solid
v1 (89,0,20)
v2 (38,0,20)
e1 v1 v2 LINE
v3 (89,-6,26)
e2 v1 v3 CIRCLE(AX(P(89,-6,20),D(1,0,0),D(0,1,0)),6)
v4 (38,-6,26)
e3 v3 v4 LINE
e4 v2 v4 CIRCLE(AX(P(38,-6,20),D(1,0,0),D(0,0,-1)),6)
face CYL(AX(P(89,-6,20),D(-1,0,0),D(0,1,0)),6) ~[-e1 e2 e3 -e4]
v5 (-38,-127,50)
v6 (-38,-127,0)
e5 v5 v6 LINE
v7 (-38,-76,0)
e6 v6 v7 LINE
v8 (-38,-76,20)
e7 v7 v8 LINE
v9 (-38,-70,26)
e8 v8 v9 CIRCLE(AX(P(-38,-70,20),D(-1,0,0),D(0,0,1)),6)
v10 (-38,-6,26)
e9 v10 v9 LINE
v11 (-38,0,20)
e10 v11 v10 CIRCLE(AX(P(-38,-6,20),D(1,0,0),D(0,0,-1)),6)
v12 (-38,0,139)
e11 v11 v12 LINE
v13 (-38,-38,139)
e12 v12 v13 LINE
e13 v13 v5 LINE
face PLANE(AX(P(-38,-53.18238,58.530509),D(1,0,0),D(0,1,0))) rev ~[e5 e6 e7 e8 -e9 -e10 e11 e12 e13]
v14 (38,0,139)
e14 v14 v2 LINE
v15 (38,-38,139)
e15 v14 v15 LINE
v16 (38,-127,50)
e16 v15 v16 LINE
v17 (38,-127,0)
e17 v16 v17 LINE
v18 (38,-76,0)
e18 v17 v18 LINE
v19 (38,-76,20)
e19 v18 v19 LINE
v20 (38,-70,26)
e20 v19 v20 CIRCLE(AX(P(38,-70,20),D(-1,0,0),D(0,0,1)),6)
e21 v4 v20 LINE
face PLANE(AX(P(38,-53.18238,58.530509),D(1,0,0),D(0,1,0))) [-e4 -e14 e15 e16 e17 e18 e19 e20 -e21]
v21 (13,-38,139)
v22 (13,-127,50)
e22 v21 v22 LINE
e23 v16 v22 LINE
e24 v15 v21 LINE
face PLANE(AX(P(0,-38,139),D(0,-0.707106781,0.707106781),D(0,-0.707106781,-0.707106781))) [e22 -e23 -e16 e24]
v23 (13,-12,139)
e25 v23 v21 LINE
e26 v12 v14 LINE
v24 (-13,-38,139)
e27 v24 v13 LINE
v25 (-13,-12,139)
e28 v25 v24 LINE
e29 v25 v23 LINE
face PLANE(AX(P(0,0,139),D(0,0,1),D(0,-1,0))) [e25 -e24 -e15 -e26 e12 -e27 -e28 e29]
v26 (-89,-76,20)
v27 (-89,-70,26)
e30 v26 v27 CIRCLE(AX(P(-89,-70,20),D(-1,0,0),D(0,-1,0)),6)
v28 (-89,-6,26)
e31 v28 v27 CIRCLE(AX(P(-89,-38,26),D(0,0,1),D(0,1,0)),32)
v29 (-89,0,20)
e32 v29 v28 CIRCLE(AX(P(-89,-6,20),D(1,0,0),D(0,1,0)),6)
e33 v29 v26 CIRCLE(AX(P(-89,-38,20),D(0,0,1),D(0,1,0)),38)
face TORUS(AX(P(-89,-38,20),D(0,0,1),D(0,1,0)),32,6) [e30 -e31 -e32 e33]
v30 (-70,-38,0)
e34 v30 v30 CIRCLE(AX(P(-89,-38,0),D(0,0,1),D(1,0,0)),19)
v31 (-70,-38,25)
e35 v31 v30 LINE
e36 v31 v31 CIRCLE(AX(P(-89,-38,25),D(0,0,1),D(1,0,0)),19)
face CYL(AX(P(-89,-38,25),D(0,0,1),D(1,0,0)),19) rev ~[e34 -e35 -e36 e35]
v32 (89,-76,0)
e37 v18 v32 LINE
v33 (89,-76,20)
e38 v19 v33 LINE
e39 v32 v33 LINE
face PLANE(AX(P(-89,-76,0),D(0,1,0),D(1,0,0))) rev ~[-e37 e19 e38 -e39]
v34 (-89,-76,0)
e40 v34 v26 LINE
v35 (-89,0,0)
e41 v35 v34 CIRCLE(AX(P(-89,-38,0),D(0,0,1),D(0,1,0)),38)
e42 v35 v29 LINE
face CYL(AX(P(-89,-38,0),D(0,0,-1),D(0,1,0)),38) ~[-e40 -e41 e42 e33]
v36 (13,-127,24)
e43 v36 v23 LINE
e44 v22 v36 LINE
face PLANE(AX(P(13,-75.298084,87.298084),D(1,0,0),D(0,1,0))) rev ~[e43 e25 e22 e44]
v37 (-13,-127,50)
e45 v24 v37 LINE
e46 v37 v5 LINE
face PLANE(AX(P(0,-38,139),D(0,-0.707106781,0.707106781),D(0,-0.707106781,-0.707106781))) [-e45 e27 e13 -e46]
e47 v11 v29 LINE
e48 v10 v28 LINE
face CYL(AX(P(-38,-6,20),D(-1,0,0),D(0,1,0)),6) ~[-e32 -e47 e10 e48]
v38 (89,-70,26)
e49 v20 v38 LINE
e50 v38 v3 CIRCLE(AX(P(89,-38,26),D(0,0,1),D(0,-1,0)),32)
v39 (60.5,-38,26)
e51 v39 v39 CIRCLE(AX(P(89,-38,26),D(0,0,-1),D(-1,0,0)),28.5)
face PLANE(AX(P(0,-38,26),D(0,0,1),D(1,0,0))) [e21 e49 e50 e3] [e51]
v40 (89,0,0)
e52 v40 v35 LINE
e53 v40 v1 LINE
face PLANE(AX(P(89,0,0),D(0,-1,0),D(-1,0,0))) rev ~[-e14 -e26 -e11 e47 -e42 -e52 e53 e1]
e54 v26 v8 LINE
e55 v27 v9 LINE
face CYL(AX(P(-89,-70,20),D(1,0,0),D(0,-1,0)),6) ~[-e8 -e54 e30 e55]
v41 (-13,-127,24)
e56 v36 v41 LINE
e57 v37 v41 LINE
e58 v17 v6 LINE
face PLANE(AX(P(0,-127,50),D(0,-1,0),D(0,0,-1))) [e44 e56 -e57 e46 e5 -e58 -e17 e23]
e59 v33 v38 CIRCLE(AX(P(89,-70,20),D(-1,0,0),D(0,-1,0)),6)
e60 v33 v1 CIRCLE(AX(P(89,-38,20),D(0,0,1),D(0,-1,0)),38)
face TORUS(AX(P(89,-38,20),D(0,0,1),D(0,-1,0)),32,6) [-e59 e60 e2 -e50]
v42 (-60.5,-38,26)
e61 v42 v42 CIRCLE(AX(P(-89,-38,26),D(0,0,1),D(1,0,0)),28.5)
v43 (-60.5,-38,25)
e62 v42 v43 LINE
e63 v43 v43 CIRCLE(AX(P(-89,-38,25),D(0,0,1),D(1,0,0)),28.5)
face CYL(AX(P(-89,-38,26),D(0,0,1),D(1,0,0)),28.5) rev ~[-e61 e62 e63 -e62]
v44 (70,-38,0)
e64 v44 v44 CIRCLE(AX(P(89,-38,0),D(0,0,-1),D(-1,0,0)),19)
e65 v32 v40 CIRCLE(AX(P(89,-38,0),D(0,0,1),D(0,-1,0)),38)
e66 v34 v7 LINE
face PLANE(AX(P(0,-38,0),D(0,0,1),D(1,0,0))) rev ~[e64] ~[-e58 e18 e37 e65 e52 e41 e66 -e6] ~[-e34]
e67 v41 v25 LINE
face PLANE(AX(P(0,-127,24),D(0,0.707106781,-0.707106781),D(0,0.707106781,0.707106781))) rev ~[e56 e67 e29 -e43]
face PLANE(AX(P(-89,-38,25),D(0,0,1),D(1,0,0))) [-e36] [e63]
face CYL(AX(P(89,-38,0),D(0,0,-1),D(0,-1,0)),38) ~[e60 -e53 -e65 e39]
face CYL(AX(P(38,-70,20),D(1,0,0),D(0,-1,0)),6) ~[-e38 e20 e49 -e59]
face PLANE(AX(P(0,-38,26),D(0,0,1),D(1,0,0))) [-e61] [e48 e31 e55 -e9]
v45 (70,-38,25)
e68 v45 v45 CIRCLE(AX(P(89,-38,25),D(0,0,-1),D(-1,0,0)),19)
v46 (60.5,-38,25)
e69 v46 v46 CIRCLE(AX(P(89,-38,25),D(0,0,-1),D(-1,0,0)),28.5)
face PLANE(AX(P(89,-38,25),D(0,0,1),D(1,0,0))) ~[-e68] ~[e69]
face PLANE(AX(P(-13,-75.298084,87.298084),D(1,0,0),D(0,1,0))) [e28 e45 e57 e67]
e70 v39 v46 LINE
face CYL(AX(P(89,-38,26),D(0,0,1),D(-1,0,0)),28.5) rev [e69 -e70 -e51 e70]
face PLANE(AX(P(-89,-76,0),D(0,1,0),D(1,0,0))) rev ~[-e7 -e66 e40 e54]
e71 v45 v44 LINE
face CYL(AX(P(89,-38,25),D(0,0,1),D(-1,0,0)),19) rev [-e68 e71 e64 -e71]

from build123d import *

# Parameters (mm, degrees)
F1_DEPTH = 38
F3_DEPTH = 13
F5_DEPTH = 26
F6_R     = 28.5
F7_DEPTH = 1
F8_R     = 19
F9_DEPTH = 25
F10_R    = 6


# Not quite as in the source:
# - a pattern or mirror of a feature is missing from the dataset's text; its kind, count and spacing are read off the source's solid


with BuildPart() as f1:
    # F0 (on Right) → F1 (new body, symmetric)
    with BuildSketch(Plane.YZ):
        Polygon((-127, 0), (0, 0), (0, 139), (-38, 139), (-127, 50), align=None)
    extrude(amount=F1_DEPTH, both=True)

    # F2 (on Right) → F3 (cut, symmetric)
    with BuildSketch(Plane.YZ):
        Polygon((-127, 24), (-12, 139), (-38, 139), (-127, 50), align=None)
    extrude(amount=F3_DEPTH, both=True, mode=Mode.SUBTRACT)

    # F4 (on Top) → F5 (join)
    with BuildSketch(Plane.XY):
        with BuildLine():
            ThreePointArc((-89, 0), (-127, -38), (-89, -76))
            Line((-89, -76), (89, -76))
            ThreePointArc((89, -76), (127, -38), (89, 0))
            Line((89, 0), (-89, 0))
        make_face()
    extrude(amount=F5_DEPTH)

    # F6 (on face) → F7 (cut)
    with BuildSketch(Plane.XY.offset(26)):
        with Locations((-89, -38)):
            Circle(F6_R)
    f7 = extrude(amount=-F7_DEPTH, mode=Mode.SUBTRACT)

    # F7_copies: F7 across plane
    add(f7.mirror(Plane(origin=(0, 0, 0), x_dir=(0, 0, 1), z_dir=(1, 0, 0))), mode=Mode.SUBTRACT)

    # F8 (on face) → F9 (cut, through all)
    with BuildSketch(Plane.XY.offset(25)):
        with Locations((-89, -38)):
            Circle(F8_R)
    f9 = extrude(amount=-F9_DEPTH, mode=Mode.SUBTRACT)

    # F9_copies: F9 across plane
    add(f9.mirror(Plane(origin=(0, 0, 0), x_dir=(0, 0, 1), z_dir=(1, 0, 0))), mode=Mode.SUBTRACT)

    # F10
    f10_edges = [f1.edges().sort_by_distance(p)[0] for p in [
        (-63.5, -76, 26),
        (63.5, 0, 26),
        (63.5, -76, 26),
        (127, -38, 26),
        (-127, -38, 26),
        (-63.5, 0, 26),
    ]]
    fillet(f10_edges, radius=F10_R)


solid = f1.part
